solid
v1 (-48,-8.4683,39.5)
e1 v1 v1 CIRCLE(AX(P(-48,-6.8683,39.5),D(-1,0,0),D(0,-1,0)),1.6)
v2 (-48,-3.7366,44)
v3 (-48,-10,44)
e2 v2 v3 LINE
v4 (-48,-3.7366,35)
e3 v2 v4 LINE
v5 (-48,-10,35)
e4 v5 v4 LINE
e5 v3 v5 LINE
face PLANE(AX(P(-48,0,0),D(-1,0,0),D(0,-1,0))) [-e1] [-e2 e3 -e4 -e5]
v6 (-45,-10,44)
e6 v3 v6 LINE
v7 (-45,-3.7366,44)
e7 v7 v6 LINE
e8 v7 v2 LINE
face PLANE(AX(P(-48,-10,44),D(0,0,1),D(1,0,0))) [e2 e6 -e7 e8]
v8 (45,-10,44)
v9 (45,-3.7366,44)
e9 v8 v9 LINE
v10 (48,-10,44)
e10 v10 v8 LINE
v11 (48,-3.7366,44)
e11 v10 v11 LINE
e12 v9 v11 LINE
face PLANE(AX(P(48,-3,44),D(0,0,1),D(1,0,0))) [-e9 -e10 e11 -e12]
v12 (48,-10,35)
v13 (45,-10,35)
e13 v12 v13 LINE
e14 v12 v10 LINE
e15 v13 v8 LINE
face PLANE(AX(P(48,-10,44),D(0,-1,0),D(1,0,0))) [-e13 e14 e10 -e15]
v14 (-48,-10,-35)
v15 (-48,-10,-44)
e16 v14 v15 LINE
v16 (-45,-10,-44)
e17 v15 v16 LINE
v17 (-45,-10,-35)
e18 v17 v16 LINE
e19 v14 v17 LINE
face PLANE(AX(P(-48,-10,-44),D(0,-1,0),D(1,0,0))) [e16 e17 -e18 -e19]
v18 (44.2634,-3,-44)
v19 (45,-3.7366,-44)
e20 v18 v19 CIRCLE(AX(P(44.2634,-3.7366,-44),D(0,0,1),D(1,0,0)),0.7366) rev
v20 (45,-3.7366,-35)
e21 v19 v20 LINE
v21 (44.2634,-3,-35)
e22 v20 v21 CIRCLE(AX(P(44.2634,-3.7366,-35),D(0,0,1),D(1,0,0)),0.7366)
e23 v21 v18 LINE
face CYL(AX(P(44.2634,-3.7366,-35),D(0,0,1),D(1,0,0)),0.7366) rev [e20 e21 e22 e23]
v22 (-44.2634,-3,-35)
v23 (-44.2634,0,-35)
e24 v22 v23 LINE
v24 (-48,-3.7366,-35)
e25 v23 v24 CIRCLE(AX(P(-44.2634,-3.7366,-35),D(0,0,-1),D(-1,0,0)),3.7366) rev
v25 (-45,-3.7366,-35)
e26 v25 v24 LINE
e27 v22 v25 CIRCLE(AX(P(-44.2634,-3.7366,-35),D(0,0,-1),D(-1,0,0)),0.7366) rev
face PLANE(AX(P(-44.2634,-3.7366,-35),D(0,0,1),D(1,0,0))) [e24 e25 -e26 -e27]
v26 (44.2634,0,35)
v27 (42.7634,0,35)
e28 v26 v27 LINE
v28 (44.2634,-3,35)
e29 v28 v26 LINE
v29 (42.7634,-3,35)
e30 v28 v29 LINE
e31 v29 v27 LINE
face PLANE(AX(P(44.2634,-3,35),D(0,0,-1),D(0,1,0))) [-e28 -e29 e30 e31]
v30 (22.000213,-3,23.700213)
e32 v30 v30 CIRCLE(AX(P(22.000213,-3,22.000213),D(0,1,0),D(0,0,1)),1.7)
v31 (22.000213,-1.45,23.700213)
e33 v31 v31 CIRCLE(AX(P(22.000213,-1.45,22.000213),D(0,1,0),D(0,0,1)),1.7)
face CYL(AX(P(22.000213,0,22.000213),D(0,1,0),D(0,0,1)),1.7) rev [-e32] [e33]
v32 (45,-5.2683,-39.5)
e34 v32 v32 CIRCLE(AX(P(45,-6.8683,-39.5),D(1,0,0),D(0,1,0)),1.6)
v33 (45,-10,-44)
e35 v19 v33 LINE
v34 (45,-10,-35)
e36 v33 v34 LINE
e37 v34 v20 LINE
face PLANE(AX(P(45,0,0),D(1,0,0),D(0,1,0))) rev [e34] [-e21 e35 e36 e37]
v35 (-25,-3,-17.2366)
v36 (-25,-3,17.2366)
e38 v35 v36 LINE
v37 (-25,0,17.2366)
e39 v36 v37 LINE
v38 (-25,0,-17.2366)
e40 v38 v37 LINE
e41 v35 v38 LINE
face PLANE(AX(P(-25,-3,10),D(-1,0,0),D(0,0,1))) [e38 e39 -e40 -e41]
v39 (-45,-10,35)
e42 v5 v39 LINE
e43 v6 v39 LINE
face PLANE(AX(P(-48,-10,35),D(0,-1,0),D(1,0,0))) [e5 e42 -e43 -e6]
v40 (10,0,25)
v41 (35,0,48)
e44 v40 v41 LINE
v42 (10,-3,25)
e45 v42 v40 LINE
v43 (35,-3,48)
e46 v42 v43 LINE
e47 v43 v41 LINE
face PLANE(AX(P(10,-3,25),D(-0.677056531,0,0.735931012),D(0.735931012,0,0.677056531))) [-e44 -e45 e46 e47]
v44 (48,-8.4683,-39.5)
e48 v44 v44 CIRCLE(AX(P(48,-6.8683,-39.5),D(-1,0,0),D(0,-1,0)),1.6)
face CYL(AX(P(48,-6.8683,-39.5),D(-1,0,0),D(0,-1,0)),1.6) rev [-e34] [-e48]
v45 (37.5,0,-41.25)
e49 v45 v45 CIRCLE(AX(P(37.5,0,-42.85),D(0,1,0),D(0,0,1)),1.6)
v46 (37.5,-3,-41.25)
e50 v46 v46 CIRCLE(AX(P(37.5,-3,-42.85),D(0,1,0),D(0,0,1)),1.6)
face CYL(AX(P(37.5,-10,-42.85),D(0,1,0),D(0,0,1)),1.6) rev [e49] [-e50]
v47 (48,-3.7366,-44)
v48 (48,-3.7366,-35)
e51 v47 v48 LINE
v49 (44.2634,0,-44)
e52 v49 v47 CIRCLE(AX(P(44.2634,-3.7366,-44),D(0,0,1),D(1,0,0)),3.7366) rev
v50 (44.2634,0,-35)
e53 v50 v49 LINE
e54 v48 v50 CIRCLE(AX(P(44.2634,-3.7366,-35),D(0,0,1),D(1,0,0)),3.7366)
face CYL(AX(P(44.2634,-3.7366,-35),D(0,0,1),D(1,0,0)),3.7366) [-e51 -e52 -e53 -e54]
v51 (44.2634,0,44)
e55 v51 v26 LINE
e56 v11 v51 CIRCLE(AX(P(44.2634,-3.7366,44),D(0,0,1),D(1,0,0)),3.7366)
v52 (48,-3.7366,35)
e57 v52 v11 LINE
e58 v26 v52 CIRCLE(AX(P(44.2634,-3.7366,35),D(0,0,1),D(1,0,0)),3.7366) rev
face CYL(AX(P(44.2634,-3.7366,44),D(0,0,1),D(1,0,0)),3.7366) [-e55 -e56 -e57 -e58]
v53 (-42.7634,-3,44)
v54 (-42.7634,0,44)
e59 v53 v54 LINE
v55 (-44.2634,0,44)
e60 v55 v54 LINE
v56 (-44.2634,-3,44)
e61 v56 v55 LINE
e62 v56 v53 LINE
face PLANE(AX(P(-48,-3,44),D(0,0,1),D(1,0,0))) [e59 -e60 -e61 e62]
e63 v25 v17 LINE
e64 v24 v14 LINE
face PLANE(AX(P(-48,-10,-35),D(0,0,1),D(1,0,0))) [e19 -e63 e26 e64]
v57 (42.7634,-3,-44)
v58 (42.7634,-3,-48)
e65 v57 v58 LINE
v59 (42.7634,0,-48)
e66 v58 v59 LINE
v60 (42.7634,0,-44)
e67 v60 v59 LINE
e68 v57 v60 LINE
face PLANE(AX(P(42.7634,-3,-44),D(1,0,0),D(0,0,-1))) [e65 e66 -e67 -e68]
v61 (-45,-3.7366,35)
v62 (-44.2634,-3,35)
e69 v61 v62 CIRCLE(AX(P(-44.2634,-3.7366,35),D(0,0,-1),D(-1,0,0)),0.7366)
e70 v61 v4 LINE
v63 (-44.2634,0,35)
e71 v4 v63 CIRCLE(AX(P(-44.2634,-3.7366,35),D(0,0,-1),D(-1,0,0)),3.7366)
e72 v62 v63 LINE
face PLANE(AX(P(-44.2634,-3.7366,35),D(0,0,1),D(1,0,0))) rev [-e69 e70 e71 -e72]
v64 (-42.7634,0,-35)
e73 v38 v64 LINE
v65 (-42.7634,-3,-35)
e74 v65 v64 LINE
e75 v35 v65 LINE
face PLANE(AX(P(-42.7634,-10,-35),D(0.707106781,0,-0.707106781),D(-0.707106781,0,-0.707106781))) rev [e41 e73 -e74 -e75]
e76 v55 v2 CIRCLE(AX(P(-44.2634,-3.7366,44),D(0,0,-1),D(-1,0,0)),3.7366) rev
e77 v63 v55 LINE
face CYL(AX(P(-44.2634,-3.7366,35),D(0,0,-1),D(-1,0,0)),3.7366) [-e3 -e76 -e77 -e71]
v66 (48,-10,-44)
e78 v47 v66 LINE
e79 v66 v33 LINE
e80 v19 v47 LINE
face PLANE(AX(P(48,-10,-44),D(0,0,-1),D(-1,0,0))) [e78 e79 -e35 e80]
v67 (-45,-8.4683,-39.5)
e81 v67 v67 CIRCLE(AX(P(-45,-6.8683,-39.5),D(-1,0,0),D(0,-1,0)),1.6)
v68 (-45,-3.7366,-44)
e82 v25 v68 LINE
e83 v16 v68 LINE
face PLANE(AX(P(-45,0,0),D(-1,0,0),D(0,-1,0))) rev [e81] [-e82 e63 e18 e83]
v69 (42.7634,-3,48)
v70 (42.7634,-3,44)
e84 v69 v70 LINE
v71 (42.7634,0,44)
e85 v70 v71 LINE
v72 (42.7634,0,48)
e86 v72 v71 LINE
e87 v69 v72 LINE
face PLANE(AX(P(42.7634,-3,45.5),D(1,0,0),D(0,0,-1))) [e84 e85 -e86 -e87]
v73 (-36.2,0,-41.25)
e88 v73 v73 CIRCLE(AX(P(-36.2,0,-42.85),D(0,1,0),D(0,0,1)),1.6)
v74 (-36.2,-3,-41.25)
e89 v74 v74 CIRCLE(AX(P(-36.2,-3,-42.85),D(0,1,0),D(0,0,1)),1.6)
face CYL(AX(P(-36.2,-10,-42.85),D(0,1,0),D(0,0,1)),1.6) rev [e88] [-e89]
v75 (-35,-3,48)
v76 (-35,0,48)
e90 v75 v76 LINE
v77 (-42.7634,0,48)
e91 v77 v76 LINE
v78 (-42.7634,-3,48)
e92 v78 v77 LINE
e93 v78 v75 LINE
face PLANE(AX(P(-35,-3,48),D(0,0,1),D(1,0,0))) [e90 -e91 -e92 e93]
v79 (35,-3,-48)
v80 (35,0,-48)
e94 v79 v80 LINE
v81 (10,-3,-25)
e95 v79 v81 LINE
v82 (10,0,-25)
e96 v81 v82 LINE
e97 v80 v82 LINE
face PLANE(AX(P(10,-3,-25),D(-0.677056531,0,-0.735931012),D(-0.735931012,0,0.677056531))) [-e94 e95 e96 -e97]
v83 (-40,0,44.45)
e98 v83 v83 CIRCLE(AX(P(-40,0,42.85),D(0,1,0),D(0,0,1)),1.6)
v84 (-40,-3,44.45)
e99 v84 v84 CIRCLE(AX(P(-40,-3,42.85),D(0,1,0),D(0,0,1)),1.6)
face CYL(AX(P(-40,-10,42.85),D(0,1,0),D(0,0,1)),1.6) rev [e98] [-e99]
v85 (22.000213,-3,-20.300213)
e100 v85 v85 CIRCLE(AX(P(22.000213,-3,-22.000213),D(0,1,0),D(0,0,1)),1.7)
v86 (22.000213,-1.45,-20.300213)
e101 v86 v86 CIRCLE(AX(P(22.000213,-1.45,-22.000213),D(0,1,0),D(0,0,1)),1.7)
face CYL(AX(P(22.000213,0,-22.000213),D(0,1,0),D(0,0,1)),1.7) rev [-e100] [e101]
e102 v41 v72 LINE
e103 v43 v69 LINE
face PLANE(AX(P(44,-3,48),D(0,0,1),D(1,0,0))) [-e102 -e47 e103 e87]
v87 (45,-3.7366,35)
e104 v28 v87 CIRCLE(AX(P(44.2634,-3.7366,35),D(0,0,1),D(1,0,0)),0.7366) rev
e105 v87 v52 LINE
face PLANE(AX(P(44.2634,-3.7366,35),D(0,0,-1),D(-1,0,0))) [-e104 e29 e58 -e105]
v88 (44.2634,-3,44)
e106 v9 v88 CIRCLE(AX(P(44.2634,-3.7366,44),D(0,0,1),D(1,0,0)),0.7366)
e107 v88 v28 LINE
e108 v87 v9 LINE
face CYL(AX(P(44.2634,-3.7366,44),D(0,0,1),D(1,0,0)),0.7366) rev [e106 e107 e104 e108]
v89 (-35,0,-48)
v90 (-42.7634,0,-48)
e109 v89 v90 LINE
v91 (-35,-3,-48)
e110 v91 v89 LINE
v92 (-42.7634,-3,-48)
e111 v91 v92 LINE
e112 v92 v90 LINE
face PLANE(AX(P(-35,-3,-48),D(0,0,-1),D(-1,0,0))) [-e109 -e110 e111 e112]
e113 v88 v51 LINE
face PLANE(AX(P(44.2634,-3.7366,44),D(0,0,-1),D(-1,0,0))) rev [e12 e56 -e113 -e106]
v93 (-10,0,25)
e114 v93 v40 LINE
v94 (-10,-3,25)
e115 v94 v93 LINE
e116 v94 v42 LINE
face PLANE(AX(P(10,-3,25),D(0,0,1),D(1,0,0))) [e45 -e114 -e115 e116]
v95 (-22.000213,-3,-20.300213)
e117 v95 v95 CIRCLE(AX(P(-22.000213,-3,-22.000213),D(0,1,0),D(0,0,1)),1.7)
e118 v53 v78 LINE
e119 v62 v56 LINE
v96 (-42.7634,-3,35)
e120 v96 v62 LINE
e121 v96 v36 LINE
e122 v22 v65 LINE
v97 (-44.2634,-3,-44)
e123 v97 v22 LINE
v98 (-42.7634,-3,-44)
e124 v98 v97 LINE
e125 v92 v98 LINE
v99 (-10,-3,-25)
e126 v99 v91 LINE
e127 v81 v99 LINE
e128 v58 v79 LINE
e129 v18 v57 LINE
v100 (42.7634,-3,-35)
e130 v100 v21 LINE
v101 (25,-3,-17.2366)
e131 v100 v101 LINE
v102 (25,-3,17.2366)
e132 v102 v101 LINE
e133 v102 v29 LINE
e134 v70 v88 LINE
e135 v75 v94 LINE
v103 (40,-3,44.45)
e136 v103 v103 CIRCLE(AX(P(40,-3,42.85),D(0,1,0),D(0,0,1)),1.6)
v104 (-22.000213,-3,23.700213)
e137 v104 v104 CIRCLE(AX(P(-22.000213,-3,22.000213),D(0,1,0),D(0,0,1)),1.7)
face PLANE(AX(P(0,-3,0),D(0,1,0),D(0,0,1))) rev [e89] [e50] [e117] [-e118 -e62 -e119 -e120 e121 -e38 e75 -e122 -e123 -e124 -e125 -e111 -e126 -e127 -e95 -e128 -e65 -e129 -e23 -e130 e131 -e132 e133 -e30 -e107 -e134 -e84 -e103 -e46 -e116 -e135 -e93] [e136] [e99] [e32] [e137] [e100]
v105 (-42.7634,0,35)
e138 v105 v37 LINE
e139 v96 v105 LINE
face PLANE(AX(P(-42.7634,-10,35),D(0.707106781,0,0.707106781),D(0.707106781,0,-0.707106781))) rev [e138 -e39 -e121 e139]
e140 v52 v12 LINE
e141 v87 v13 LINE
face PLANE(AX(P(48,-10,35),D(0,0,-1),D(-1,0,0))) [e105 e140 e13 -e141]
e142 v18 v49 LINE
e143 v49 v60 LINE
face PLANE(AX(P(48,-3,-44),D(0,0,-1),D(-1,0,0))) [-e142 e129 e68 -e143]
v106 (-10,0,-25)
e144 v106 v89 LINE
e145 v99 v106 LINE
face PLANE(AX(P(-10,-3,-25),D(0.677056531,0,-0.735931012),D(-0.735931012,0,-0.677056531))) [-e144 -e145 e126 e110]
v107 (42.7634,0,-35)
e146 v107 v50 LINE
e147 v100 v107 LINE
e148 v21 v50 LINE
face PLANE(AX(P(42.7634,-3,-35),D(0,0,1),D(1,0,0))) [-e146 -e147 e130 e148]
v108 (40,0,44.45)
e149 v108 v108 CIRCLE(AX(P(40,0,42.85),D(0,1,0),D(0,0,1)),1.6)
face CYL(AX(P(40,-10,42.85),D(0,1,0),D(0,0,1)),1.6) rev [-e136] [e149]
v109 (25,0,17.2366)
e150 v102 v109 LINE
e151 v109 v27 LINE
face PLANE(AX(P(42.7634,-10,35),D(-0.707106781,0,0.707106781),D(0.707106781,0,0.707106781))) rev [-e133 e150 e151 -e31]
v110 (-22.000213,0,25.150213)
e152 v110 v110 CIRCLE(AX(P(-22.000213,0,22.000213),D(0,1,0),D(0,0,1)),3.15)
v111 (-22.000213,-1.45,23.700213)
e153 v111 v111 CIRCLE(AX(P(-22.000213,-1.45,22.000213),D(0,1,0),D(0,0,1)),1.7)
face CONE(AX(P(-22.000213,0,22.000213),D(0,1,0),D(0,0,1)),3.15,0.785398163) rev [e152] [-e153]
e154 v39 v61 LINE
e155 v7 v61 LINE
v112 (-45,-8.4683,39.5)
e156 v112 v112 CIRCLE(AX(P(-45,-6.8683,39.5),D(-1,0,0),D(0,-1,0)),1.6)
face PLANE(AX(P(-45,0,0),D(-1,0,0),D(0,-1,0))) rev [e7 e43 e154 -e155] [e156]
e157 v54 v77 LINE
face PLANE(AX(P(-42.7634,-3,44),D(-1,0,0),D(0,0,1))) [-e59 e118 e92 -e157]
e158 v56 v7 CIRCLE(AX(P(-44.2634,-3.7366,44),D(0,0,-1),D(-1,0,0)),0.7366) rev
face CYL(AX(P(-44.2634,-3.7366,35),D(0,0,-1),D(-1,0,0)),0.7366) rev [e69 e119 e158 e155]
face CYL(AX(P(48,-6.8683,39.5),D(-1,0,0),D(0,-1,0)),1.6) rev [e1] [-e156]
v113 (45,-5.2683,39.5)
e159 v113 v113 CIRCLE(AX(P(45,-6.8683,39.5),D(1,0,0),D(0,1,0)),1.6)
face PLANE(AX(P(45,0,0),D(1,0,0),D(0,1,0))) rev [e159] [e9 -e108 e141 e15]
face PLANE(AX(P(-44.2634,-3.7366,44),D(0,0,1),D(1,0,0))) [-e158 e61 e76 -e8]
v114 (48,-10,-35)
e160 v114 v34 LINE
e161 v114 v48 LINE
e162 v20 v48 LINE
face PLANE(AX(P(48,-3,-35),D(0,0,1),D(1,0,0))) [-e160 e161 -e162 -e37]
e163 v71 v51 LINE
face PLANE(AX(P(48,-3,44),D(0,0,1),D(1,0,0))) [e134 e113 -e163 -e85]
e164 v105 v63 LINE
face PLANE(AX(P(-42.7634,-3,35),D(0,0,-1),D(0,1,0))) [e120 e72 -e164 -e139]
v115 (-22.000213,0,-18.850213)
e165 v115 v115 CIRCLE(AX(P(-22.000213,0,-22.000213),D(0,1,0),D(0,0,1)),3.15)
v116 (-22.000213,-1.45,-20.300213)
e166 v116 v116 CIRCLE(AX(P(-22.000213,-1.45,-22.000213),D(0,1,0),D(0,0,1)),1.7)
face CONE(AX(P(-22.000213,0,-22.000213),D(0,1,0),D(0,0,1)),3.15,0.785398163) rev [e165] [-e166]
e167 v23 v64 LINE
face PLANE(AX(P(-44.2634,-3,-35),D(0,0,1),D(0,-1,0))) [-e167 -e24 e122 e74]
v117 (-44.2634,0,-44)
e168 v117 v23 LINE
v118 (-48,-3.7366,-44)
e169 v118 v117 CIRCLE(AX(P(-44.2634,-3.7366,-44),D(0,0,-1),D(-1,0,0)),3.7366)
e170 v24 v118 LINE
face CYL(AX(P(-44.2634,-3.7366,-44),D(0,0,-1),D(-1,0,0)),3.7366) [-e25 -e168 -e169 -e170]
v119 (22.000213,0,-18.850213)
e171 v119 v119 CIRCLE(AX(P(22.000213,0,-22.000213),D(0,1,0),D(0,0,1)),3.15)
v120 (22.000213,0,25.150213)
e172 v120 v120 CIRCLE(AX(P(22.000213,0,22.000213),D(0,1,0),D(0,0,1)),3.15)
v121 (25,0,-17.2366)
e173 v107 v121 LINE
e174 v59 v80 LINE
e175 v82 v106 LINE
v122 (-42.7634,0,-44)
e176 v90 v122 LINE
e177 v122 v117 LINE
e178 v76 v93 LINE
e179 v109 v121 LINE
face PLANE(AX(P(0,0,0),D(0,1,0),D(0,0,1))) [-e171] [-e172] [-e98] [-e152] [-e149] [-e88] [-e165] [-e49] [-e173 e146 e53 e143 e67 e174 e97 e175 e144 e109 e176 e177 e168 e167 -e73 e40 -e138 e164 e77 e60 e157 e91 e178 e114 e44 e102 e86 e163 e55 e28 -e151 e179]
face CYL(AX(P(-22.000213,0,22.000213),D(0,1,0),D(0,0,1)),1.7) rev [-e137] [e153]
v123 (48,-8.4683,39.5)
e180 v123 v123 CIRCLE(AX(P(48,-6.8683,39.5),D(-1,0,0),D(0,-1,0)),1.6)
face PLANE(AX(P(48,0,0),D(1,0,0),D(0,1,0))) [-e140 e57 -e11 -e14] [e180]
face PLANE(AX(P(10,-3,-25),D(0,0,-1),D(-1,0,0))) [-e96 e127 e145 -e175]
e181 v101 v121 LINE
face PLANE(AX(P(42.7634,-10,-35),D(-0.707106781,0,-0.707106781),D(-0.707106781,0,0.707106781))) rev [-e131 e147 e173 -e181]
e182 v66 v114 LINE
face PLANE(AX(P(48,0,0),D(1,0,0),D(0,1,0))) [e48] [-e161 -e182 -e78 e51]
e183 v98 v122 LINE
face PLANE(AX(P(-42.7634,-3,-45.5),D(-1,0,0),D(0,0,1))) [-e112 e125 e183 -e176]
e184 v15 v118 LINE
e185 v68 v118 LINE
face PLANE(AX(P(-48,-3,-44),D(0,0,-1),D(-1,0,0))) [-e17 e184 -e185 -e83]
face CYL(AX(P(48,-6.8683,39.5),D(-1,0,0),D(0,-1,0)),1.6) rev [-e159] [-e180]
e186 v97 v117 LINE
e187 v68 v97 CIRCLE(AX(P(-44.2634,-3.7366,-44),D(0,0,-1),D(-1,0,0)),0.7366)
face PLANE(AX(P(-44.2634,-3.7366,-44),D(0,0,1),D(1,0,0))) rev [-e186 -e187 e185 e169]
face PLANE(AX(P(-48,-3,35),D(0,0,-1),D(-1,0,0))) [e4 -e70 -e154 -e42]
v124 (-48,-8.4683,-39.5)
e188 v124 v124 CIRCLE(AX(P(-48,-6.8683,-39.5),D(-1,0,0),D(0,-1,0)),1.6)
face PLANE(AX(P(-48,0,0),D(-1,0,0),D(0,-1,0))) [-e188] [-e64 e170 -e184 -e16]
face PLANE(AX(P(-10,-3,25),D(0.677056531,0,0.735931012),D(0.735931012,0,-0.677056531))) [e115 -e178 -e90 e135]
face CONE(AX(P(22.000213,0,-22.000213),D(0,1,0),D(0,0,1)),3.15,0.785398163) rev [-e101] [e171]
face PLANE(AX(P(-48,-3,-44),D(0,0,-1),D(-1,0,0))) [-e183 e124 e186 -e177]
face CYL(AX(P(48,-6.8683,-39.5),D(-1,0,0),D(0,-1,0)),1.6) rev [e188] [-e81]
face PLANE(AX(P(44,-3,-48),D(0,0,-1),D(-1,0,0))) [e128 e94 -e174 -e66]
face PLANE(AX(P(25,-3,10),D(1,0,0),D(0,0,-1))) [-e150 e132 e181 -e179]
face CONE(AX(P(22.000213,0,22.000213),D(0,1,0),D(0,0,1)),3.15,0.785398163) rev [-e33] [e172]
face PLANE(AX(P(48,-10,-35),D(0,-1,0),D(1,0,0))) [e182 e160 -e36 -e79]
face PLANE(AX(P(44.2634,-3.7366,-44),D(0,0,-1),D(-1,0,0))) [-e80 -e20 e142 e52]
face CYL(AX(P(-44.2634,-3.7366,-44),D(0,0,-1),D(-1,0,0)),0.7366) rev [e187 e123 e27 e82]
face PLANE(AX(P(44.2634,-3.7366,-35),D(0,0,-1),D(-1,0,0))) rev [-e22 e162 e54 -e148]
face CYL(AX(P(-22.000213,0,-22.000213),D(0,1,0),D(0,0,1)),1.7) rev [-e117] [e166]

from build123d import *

# Parameters (mm, degrees)
SKETCH1_R                                       = 1.6
BASE_FLANGE1_DEPTH                              = 3
EDGE_FLANGE1_START                              = -44
EDGE_FLANGE1_DEPTH                              = 10.5
EDGE_FLANGE1_START_2                            = 33.5
EDGE_FLANGE1_2_DEPTH                            = 10.5
EDGE_FLANGE1_START_3                            = -35
EDGE_FLANGE1_3_DEPTH                            = 1.5
EDGE_FLANGE1_4_DEPTH                            = 1.5
EDGE_FLANGE1_START_4                            = -45.5
EDGE_FLANGE1_5_OUTLINE_W                        = 1.2366
EDGE_FLANGE1_5_OUTLINE_H                        = 3
EDGE_FLANGE1_5_DEPTH                            = 1.5
EDGE_FLANGE1_START_5                            = 44
EDGE_FLANGE1_6_OUTLINE_W                        = 1.2366
EDGE_FLANGE1_6_OUTLINE_H                        = 3
EDGE_FLANGE1_6_DEPTH                            = 1.5
EDGE_FLANGE1_7_DEPTH                            = 9
EDGE_FLANGE1_START_6                            = 35
EDGE_FLANGE1_8_DEPTH                            = 9
CUT_EXTRUDE2_DEPTH                              = 108.796103826
CUT_EXTRUDE2_DEPTH_BACK                         = 108.796103826
SKETCH27_R                                      = 1.6
SKETCH29_R                                      = 1.6
CUT_EXTRUDE4_DEPTH                              = 69.614867194
SKETCH40_W                                      = 1.2366
SKETCH40_H                                      = 2.5
CUT_EXTRUDE5_DEPTH                              = 69.614867194
CSK_FOR_M3_FLAT_HEAD_MACHINE_SCREW1_D           = 3.4
CSK_FOR_M3_FLAT_HEAD_MACHINE_SCREW1_CSINK_D     = 6.3
CSK_FOR_M3_FLAT_HEAD_MACHINE_SCREW1_CSINK_ANGLE = 90


# Read off the part's stored shape, not the designer's step: Edge-Flange1
# Sheet-metal steps are written as plain solids
with BuildPart() as part:
    # Sketch1 → Base-Flange1 (new body)
    with BuildSketch(Plane(origin=(0, 0, 0), x_dir=(1, 0, 0), z_dir=(0, 1, 0))):
        Polygon((-10, 25), (-35, 48), (-44, 48), (-44, 44), (-48, 44), (-48, 35), (-25, 10), (-25, -10), (-48, -35), (-48, -44), (-44, -44), (-44, -48), (-35, -48), (-10, -25), (10, -25), (35, -48), (44, -48), (44, -44), (48, -44), (48, -35), (25, -10), (25, 10), (48, 35), (48, 44), (44, 44), (44, 48), (35, 48), (10, 25), align=None)
        with Locations(Location((-22.000213283, 22.000213283, 0), (0, 0, 270))):
            Circle(SKETCH1_R, mode=Mode.SUBTRACT)
        with Locations(Location((22.000213283, 22.000213283, 0), (0, 0, 270))):
            Circle(SKETCH1_R, mode=Mode.SUBTRACT)
        with Locations(Location((22.000213283, -22.000213283, 0), (0, 0, 270))):
            Circle(SKETCH1_R, mode=Mode.SUBTRACT)
        with Locations(Location((-22.000213283, -22.000213283, 0), (0, 0, 270))):
            Circle(SKETCH1_R, mode=Mode.SUBTRACT)
    extrude(amount=-BASE_FLANGE1_DEPTH)

    # Edge-Flange1 outline → Edge-Flange1 (cut)
    with BuildSketch(Plane.XY.offset(EDGE_FLANGE1_START)):
        with BuildLine():
            ThreePointArc((-47.926677222, -3), (-46.630867001, -0.845704021), (-44.2634, 0))
            Line((-44.2634, 0), (-48, 0))
            Line((-48, 0), (-48, -3))
            Line((-48, -3), (-47.926677222, -3))
        make_face()
        with BuildLine():
            Line((48, 0), (44.2634, 0))
            ThreePointArc((44.2634, 0), (46.630867001, -0.845704021), (47.926677222, -3))
            Line((47.926677222, -3), (48, -3))
            Line((48, -3), (48, 0))
        make_face()
    extrude(amount=EDGE_FLANGE1_DEPTH, mode=Mode.SUBTRACT)

    # Edge-Flange1 2 outline → Edge-Flange1 2 (cut)
    with BuildSketch(Plane.XY.offset(EDGE_FLANGE1_START_2)):
        with BuildLine():
            ThreePointArc((-47.926677222, -3), (-46.630867001, -0.845704021), (-44.2634, 0))
            Line((-44.2634, 0), (-48, 0))
            Line((-48, 0), (-48, -3))
            Line((-48, -3), (-47.926677222, -3))
        make_face()
        with BuildLine():
            Line((48, 0), (44.2634, 0))
            ThreePointArc((44.2634, 0), (46.630867001, -0.845704021), (47.926677222, -3))
            Line((47.926677222, -3), (48, -3))
            Line((48, -3), (48, 0))
        make_face()
    extrude(amount=EDGE_FLANGE1_2_DEPTH, mode=Mode.SUBTRACT)

    # Edge-Flange1 3 outline → Edge-Flange1 3 (cut)
    with BuildSketch(Plane.XY.offset(EDGE_FLANGE1_START_3)):
        with BuildLine():
            Line((-42.7634, -3), (-42.7634, 0))
            Line((-42.7634, 0), (-44.2634, 0))
            ThreePointArc((-44.2634, 0), (-46.630867001, -0.845704021), (-47.926677222, -3))
            Line((-47.926677222, -3), (-42.7634, -3))
        make_face()
        with BuildLine():
            Line((42.7634, 0), (42.7634, -3))
            Line((42.7634, -3), (47.926677222, -3))
            ThreePointArc((47.926677222, -3), (46.630867001, -0.845704021), (44.2634, 0))
            Line((44.2634, 0), (42.7634, 0))
        make_face()
    extrude(amount=EDGE_FLANGE1_3_DEPTH, mode=Mode.SUBTRACT)

    # Edge-Flange1 4 outline → Edge-Flange1 4 (cut)
    with BuildSketch(Plane.XY.offset(EDGE_FLANGE1_START_2)):
        with BuildLine():
            Line((-42.7634, -3), (-42.7634, 0))
            Line((-42.7634, 0), (-44.2634, 0))
            ThreePointArc((-44.2634, 0), (-46.630867001, -0.845704021), (-47.926677222, -3))
            Line((-47.926677222, -3), (-42.7634, -3))
        make_face()
        with BuildLine():
            Line((42.7634, 0), (42.7634, -3))
            Line((42.7634, -3), (47.926677222, -3))
            ThreePointArc((47.926677222, -3), (46.630867001, -0.845704021), (44.2634, 0))
            Line((44.2634, 0), (42.7634, 0))
        make_face()
    extrude(amount=EDGE_FLANGE1_4_DEPTH, mode=Mode.SUBTRACT)

    # Edge-Flange1 5 outline → Edge-Flange1 5 (cut)
    with BuildSketch(Plane.XY.offset(EDGE_FLANGE1_START_4)):
        with Locations((-43.3817, -1.5)):
            Rectangle(EDGE_FLANGE1_5_OUTLINE_W, EDGE_FLANGE1_5_OUTLINE_H)
        with Locations((43.3817, -1.5)):
            Rectangle(EDGE_FLANGE1_5_OUTLINE_W, EDGE_FLANGE1_5_OUTLINE_H)
    extrude(amount=EDGE_FLANGE1_5_DEPTH, mode=Mode.SUBTRACT)

    # Edge-Flange1 6 outline → Edge-Flange1 6 (cut)
    with BuildSketch(Plane.XY.offset(EDGE_FLANGE1_START_5)):
        with Locations((-43.3817, -1.5)):
            Rectangle(EDGE_FLANGE1_6_OUTLINE_W, EDGE_FLANGE1_6_OUTLINE_H)
        with Locations((43.3817, -1.5)):
            Rectangle(EDGE_FLANGE1_6_OUTLINE_W, EDGE_FLANGE1_6_OUTLINE_H)
    extrude(amount=EDGE_FLANGE1_6_DEPTH, mode=Mode.SUBTRACT)

    # Edge-Flange1 7 outline → Edge-Flange1 7 (add)
    with BuildSketch(Plane.XY.offset(EDGE_FLANGE1_START)):
        with BuildLine():
            ThreePointArc((-45, -3.7366), (-44.784254855, -3.215745145), (-44.2634, -3))
            Line((-44.2634, -3), (-47.926677222, -3))
            ThreePointArc((-47.926677222, -3), (-47.981624121, -3.36647982), (-48, -3.7366))
            Line((-48, -3.7366), (-48, -10))
            Line((-48, -10), (-45, -10))
            Line((-45, -10), (-45, -3.7366))
        make_face()
        with BuildLine():
            Line((47.926677222, -3), (44.2634, -3))
            ThreePointArc((44.2634, -3), (44.784254855, -3.215745145), (45, -3.7366))
            Line((45, -3.7366), (45, -10))
            Line((45, -10), (48, -10))
            Line((48, -10), (48, -3.7366))
            ThreePointArc((48, -3.7366), (47.981624121, -3.36647982), (47.926677222, -3))
        make_face()
    extrude(amount=EDGE_FLANGE1_7_DEPTH)

    # Edge-Flange1 8 outline → Edge-Flange1 8 (add)
    with BuildSketch(Plane.XY.offset(EDGE_FLANGE1_START_6)):
        with BuildLine():
            ThreePointArc((-45, -3.7366), (-44.784254855, -3.215745145), (-44.2634, -3))
            Line((-44.2634, -3), (-47.926677222, -3))
            ThreePointArc((-47.926677222, -3), (-47.981624121, -3.36647982), (-48, -3.7366))
            Line((-48, -3.7366), (-48, -10))
            Line((-48, -10), (-45, -10))
            Line((-45, -10), (-45, -3.7366))
        make_face()
        with BuildLine():
            Line((47.926677222, -3), (44.2634, -3))
            ThreePointArc((44.2634, -3), (44.784254855, -3.215745145), (45, -3.7366))
            Line((45, -3.7366), (45, -10))
            Line((45, -10), (48, -10))
            Line((48, -10), (48, -3.7366))
            ThreePointArc((48, -3.7366), (47.981624121, -3.36647982), (47.926677222, -3))
        make_face()
    extrude(amount=EDGE_FLANGE1_8_DEPTH)

    # Sketch27 → Cut-Extrude2 (cut, two sides: drawn at the far end of the back side and taken through both)
    with BuildSketch(Plane.ZY.offset(48).offset(-CUT_EXTRUDE2_DEPTH_BACK)):
        with Locations(Location((39.5, -6.8683, 0), (0, 0, 270))):
            Circle(SKETCH27_R)
        with Locations(Location((-39.5, -6.8683, 0), (0, 0, 270))):
            Circle(SKETCH27_R)
    extrude(amount=CUT_EXTRUDE2_DEPTH + CUT_EXTRUDE2_DEPTH_BACK, mode=Mode.SUBTRACT)

    # Sketch29 → Cut-Extrude4 (cut, through all)
    with BuildSketch(Plane(origin=(0, 0, 0), x_dir=(1, 0, 0), z_dir=(0, 1, 0))):
        with Locations(Location((-36.2, 42.85, 0), (0, 0, 270))):
            Circle(SKETCH29_R)
        with Locations(Location((37.5, 42.85, 0), (0, 0, 270))):
            Circle(SKETCH29_R)
        with Locations(Location((40, -42.85, 0), (0, 0, 270))):
            Circle(SKETCH29_R)
        with Locations(Location((-40, -42.85, 0), (0, 0, 270))):
            Circle(SKETCH29_R)
    extrude(amount=-CUT_EXTRUDE4_DEPTH, mode=Mode.SUBTRACT)

    # Sketch40 → Cut-Extrude5 (cut, through all)
    with BuildSketch(Plane(origin=(0, 0, 0), x_dir=(1, 0, 0), z_dir=(0, 1, 0))):
        Polygon((-42.7634, 35), (-25, 17.2366), (-25, 10), (-46.62, 33.5), (-42.7634, 33.5), align=None)
        with Locations((-43.3817, 46.75)):
            Rectangle(SKETCH40_W, SKETCH40_H)
        Polygon((42.7634, 33.5), (42.7634, 35), (25, 17.2366), (25, 10), (46.62, 33.5), align=None)
        with Locations((43.3817, 46.75)):
            Rectangle(SKETCH40_W, SKETCH40_H)
        Polygon((42.7634, -35), (25, -17.2366), (25, -10), (46.62, -33.5), (42.7634, -33.5), align=None)
        with Locations((43.3817, -46.75)):
            Rectangle(SKETCH40_W, SKETCH40_H)
        Polygon((-42.7634, -33.5), (-42.7634, -35), (-25, -17.2366), (-25, -10), (-46.62, -33.5), align=None)
        with Locations((-43.3817, -46.75)):
            Rectangle(SKETCH40_W, SKETCH40_H)
    extrude(amount=-CUT_EXTRUDE5_DEPTH, mode=Mode.SUBTRACT)

    # CSK for M3 Flat Head Machine Screw1 (through all)
    with Locations(Plane(origin=(0, 0, 0), x_dir=(1, 0, 0), z_dir=(0, 1, 0))):
        with Locations((-22.000213283, 22.000213283), (22.000213283, 22.000213283), (22.000213283, -22.000213283), (-22.000213283, -22.000213283)):
            CounterSinkHole(CSK_FOR_M3_FLAT_HEAD_MACHINE_SCREW1_D / 2, CSK_FOR_M3_FLAT_HEAD_MACHINE_SCREW1_CSINK_D / 2, counter_sink_angle=CSK_FOR_M3_FLAT_HEAD_MACHINE_SCREW1_CSINK_ANGLE)


solid = part.part
